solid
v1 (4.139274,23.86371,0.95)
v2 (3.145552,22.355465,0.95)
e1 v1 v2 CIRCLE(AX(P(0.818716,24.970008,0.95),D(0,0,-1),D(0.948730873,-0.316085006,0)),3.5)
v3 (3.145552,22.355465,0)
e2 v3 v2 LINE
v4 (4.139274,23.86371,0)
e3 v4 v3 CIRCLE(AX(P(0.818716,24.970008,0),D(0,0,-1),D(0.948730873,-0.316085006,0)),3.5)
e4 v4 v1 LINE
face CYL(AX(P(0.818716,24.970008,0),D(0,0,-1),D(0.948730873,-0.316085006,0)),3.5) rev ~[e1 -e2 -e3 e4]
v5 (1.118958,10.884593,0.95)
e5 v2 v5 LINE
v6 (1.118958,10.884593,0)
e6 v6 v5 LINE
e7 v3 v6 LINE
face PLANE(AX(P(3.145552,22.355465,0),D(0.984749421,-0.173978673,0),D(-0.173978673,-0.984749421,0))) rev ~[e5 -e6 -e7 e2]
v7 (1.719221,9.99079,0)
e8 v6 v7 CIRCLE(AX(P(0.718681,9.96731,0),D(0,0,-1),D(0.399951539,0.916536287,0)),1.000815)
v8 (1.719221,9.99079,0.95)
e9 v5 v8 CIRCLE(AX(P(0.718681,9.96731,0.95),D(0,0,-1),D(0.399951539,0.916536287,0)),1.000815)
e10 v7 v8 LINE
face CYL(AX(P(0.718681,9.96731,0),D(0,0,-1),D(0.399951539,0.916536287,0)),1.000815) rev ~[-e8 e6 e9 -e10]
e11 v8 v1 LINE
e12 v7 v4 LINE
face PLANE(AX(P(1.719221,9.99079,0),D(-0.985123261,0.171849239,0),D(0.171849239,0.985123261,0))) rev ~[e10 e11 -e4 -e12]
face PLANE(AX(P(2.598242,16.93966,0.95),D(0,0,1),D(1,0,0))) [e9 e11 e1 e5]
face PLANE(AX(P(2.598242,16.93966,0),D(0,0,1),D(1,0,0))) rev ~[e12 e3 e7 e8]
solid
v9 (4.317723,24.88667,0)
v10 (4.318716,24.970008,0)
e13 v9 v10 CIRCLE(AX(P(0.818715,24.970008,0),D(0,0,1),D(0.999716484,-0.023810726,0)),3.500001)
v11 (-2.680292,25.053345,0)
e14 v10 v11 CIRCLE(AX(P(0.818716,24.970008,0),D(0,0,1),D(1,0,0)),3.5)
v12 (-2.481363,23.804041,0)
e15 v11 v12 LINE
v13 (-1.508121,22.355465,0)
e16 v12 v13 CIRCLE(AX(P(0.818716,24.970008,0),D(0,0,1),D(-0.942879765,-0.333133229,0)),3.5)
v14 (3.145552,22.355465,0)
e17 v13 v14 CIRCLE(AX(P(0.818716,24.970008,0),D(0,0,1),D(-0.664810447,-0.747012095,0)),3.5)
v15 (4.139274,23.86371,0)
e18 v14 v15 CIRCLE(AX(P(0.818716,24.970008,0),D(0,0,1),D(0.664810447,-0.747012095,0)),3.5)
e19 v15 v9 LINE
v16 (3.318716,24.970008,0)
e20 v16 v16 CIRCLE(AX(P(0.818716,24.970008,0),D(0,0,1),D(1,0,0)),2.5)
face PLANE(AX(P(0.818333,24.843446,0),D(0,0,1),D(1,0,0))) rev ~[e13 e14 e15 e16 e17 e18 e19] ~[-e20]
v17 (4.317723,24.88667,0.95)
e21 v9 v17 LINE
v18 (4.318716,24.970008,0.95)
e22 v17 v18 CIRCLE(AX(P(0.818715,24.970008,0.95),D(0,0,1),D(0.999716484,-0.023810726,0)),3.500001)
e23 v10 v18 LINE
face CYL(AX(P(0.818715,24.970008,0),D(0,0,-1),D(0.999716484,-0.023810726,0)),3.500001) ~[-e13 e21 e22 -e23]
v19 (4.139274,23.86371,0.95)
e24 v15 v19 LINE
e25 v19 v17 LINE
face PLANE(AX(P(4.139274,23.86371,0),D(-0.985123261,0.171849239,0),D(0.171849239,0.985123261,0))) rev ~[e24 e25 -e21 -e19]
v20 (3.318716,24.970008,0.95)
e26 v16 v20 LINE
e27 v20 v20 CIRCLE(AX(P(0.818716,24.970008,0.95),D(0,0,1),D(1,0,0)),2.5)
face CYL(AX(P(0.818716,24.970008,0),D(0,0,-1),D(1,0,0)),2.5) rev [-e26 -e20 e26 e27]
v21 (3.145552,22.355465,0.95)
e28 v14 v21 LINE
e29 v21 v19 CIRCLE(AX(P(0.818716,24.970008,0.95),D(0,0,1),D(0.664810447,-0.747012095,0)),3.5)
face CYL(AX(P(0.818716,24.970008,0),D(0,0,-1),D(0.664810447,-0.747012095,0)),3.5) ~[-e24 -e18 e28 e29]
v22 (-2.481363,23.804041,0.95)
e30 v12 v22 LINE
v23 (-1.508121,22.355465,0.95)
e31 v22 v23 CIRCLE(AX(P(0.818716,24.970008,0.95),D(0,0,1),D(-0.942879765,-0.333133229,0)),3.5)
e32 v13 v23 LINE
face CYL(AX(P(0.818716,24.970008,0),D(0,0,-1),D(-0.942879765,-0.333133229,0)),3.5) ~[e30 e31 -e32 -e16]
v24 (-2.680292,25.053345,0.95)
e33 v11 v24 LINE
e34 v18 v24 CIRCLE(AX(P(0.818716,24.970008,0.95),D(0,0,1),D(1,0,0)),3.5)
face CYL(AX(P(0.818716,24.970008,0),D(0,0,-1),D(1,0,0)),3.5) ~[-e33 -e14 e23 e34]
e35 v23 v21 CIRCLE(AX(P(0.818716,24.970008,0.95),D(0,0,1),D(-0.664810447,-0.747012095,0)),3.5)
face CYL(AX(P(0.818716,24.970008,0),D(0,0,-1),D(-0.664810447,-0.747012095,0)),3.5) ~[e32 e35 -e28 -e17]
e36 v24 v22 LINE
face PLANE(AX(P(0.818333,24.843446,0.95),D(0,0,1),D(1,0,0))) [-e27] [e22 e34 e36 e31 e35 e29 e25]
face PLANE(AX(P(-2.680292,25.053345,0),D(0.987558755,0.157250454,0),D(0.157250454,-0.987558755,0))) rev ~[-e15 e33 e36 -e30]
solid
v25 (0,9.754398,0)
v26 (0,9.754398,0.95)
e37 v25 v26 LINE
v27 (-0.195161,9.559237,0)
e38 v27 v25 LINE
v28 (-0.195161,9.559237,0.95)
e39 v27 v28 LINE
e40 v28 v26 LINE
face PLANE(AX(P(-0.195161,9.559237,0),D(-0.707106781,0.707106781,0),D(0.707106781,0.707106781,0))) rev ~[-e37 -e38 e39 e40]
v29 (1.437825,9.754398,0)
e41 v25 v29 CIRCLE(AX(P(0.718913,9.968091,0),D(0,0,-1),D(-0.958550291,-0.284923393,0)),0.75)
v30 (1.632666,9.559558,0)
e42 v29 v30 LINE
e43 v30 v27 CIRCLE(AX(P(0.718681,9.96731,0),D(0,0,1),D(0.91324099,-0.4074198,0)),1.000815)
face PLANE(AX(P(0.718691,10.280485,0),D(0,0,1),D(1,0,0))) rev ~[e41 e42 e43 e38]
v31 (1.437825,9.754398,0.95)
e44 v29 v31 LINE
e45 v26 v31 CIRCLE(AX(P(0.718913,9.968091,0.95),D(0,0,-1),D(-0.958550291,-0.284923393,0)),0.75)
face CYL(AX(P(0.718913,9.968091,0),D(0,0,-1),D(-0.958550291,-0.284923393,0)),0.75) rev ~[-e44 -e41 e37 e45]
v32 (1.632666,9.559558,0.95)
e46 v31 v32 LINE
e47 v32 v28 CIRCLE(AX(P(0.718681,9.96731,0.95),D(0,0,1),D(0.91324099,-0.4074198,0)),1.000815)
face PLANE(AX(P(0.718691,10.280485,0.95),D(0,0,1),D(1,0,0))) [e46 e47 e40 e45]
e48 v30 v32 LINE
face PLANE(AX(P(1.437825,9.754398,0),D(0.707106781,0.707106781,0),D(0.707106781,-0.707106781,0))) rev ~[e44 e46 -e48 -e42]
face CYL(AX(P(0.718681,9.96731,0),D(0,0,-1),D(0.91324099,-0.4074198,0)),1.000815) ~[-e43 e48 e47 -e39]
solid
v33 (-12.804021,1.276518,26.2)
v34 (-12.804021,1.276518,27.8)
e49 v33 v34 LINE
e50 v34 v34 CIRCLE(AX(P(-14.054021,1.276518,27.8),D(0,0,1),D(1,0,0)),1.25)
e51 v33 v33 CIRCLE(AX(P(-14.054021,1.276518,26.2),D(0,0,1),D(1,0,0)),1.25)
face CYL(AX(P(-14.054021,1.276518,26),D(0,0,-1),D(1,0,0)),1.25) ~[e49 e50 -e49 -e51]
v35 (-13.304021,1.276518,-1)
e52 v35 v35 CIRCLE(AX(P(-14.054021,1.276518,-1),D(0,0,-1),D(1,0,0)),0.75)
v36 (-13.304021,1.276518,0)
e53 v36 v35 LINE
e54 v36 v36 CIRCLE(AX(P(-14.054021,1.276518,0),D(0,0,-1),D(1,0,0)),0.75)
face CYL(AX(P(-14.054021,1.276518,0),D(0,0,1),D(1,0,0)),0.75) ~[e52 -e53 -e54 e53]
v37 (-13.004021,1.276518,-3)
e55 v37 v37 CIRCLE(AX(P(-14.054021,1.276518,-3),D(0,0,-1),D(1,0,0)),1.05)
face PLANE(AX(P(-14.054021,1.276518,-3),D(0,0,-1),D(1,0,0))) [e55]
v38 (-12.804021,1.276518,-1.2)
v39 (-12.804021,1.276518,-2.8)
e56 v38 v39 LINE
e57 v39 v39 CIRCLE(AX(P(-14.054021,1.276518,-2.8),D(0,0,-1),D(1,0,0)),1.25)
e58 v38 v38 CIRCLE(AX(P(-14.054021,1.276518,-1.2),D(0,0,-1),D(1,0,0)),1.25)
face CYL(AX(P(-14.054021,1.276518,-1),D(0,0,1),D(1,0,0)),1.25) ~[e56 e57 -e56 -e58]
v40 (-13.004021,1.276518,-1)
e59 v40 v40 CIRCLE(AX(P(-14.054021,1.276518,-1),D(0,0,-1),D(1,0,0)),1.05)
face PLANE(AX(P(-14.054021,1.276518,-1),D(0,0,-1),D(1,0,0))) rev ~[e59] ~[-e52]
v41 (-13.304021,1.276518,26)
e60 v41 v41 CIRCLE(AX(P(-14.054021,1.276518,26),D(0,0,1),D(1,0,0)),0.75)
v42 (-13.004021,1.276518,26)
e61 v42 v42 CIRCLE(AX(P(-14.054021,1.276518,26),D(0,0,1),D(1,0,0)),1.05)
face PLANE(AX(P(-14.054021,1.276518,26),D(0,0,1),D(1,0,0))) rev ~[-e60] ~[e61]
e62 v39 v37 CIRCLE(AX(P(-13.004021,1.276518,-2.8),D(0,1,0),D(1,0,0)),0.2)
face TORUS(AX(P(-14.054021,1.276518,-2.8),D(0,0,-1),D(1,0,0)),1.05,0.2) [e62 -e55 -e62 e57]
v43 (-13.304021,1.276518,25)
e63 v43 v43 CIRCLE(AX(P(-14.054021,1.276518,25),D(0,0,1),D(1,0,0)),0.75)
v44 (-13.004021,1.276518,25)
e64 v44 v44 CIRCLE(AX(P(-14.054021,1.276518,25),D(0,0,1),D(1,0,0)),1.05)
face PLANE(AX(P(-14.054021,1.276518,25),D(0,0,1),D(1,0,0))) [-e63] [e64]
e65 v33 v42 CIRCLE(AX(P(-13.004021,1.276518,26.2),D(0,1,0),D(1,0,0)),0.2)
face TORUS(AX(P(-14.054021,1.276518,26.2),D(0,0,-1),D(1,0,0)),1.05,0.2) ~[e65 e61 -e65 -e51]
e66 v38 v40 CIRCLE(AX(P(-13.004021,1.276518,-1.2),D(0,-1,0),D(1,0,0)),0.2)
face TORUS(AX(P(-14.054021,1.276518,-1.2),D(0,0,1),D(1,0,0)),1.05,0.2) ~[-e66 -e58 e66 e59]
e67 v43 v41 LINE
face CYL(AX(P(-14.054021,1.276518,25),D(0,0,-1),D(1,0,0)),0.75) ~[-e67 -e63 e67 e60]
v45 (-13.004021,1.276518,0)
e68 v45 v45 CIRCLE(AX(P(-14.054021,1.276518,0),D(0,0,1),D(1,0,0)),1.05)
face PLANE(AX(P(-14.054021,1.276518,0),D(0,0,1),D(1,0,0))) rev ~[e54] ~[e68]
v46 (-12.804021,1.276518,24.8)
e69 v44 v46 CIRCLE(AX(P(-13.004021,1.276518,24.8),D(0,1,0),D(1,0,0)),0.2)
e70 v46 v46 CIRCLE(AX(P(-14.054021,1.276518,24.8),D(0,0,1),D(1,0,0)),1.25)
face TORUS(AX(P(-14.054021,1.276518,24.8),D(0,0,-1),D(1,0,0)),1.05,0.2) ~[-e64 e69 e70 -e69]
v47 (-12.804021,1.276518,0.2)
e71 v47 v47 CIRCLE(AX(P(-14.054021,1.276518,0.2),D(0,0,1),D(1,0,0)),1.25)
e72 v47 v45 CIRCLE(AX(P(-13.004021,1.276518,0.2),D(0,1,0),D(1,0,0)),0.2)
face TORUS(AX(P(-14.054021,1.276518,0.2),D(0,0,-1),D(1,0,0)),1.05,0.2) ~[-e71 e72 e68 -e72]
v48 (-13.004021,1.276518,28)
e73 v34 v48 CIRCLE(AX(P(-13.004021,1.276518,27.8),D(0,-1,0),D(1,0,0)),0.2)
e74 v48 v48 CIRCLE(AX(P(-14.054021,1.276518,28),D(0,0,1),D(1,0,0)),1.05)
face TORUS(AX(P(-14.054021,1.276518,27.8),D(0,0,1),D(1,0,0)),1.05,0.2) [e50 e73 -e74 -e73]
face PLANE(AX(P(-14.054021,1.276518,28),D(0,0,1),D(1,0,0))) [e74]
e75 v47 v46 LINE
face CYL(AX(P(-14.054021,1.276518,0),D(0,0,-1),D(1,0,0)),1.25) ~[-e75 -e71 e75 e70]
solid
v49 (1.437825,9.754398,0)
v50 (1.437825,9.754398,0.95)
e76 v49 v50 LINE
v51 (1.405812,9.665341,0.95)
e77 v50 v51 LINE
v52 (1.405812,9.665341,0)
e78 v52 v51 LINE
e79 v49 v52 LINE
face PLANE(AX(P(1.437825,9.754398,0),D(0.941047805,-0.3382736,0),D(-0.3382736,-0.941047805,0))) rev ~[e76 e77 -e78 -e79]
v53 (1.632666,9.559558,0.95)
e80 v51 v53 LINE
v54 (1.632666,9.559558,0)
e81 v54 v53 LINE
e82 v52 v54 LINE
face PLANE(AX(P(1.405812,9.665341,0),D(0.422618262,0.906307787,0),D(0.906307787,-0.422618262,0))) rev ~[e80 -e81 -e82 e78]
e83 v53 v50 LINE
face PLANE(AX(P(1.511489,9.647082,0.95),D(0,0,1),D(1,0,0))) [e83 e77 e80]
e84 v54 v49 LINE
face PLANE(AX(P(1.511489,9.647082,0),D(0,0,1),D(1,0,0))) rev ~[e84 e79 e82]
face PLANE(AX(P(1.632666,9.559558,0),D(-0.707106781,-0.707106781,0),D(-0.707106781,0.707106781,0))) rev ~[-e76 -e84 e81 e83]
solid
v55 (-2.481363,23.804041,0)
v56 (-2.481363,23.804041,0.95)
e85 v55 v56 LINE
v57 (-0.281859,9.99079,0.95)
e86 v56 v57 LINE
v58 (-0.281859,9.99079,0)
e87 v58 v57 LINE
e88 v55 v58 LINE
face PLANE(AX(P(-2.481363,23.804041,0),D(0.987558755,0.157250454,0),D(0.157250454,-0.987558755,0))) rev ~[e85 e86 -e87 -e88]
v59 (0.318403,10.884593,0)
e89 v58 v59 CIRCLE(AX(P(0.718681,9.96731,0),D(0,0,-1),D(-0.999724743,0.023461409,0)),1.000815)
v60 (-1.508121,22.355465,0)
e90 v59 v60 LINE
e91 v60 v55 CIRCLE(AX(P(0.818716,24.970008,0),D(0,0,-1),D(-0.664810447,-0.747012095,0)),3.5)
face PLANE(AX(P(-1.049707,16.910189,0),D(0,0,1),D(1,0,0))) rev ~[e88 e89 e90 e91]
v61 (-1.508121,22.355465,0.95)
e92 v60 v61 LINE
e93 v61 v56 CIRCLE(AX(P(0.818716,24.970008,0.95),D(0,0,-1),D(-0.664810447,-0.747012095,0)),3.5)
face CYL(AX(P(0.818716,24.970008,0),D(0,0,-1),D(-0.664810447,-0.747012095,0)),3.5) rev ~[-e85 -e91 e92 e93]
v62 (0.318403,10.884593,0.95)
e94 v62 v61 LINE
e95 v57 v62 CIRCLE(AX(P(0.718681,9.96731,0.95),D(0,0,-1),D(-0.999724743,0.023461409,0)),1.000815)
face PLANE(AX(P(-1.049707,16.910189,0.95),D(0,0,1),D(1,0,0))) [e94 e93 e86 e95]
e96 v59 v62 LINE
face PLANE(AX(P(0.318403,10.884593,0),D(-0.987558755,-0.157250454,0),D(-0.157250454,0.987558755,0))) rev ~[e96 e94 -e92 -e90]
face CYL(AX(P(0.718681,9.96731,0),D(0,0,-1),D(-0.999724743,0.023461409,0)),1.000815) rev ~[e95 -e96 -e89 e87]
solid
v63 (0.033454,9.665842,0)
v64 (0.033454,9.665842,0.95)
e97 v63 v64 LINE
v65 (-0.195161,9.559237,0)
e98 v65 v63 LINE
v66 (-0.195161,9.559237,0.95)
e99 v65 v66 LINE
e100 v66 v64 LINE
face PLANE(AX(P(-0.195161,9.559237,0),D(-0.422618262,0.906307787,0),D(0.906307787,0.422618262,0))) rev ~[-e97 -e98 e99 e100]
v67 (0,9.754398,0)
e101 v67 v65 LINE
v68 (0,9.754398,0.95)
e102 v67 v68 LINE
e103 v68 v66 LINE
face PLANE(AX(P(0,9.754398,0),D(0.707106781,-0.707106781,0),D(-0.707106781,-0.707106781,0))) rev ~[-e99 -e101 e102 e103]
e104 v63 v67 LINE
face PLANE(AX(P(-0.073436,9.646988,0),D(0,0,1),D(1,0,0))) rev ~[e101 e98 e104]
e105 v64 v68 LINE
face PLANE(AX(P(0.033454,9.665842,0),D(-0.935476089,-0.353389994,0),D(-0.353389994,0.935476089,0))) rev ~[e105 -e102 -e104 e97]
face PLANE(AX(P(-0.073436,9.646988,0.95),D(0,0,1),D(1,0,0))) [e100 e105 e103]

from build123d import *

# Parameters (mm, degrees)
F0_R      = 1.25
F1_DEPTH  = 25
F2_R      = 0.75
F3_DEPTH  = 1
F4_R      = 1.25
F5_DEPTH  = 2
F6_R      = 0.2
F7_R      = 0.75
F8_DEPTH  = 1
F9_R      = 1.25
F10_DEPTH = 2
F11_R     = 0.2
F14_DEPTH = 0.95
F13_R     = 2.5
F15_DEPTH = 0.95


# Not quite as in the source:
# - a feature names something its author has since deleted; it is built from what else it names


with BuildPart() as f1:
    # F0 (on Top) → F1 (new body)
    with BuildSketch(Plane.XY):
        with Locations((-14.0540208668, 1.2765177526)):
            Circle(F0_R)
    extrude(amount=F1_DEPTH)

    # F2 (on face) → F3 (join)
    with BuildSketch(Plane.XY.offset(25)):
        with Locations((-14.0540208668, 1.2765177526)):
            Circle(F2_R)
    extrude(amount=F3_DEPTH)

    # F4 (on face) → F5 (join)
    with BuildSketch(Plane.XY.offset(26)):
        with Locations((-14.0540208668, 1.2765177526)):
            Circle(F4_R)
    extrude(amount=F5_DEPTH)

    # F6
    f6_edges = [f1.edges().sort_by_distance(p)[0] for p in [
        (-15.304021, 1.276518, 25),
        (-15.304021, 1.276518, 26),
        (-15.304021, 1.276518, 28),
        (-15.304021, 1.276518, 0),
    ]]
    fillet(f6_edges, radius=F6_R)

    # F7 (on face) → F8 (join)
    with BuildSketch(Plane(origin=(0, 0, 0), x_dir=(1, 0, 0), z_dir=(0, 0, -1))):
        with Locations((-14.0540208668, -1.2765177526)):
            Circle(F7_R)
    extrude(amount=F8_DEPTH)

    # F9 (on face) → F10 (join)
    with BuildSketch(Plane(origin=(0, 0, -1), x_dir=(1, 0, 0), z_dir=(0, 0, -1))):
        with Locations((-14.0540208668, -1.2765177526)):
            Circle(F9_R)
    extrude(amount=F10_DEPTH)

    # F11
    f11_edges = [f1.edges().sort_by_distance(p)[0] for p in [
        (-15.304021, 1.276518, -3),
        (-15.304021, 1.276518, -1),
    ]]
    fillet(f11_edges, radius=F11_R)


with BuildPart() as f14:
    # F12 (on Top) → F14 (new body)
    with BuildSketch(Plane.XY):
        with BuildLine():
            ThreePointArc((0, 9.754398472), (0.718912718, 10.7180910171), (1.4378254361, 9.754398472))
            Line((1.4378254361, 9.754398472), (1.6326663215, 9.5595575866))
            ThreePointArc((1.6326663215, 9.5595575866), (0.7185053455, 10.9681246644), (-0.1951614716, 9.5592370004))
            Line((-0.1951614716, 9.5592370004), (0, 9.754398472))
        make_face()
    extrude(amount=F14_DEPTH)


with BuildPart() as f14b:
    # F13 (on face) → F14, piece 2 (new body)
    with BuildSketch(Plane.XY):
        with BuildLine():
            ThreePointArc((4.3177234546, 24.8866700044), (4.3184676742, 24.9283358265), (4.3187157592, 24.9700075561))
            ThreePointArc((4.3187157592, 24.9700075561), (0.8603874888, 28.4697594712), (-2.6802919362, 25.0533451079))
            Line((-2.6802919362, 25.0533451079), (-2.4813634191, 23.8040412543))
            ThreePointArc((-2.4813634191, 23.8040412543), (-2.0864758559, 23.0181208586), (-1.5081208042, 22.3554652239))
            ThreePointArc((-1.5081208042, 22.3554652239), (0.8187157592, 21.4700075561), (3.1455523226, 22.3554652239))
            ThreePointArc((3.1455523226, 22.3554652239), (3.7413801422, 23.044382228), (4.1392738139, 23.863710035))
            Line((4.1392738139, 23.863710035), (4.3177234546, 24.8866700044))
        make_face()
        with Locations((0.8187157592, 24.9700075561)):
            Circle(F13_R, mode=Mode.SUBTRACT)
    extrude(amount=F14_DEPTH)


with BuildPart() as f14c:
    # F13 (on face) → F14, piece 3 (new body)
    with BuildSketch(Plane.XY):
        Polygon((0, 9.754398472), (-0.1951614716, 9.5592370004), (0.0334535479, 9.6658419348), align=None)
    extrude(amount=F14_DEPTH)


with BuildPart() as f14d:
    # F13 (on face) → F14, piece 4 (new body)
    with BuildSketch(Plane.XY):
        Polygon((1.4058124998, 9.6653412609), (1.6326663215, 9.5595575866), (1.4378254361, 9.754398472), align=None)
    extrude(amount=F14_DEPTH)


with BuildPart() as f15:
    # F13 (on face) → F15 (new body)
    with BuildSketch(Plane.XY):
        with BuildLine():
            ThreePointArc((-1.5081208042, 22.3554652239), (-2.0864758559, 23.0181208586), (-2.4813634191, 23.8040412543))
            Line((-2.4813634191, 23.8040412543), (-0.281858813, 9.9907900398))
            ThreePointArc((-0.281858813, 9.9907900398), (-0.1121579443, 10.5252860826), (0.3184033106, 10.8845929296))
            Line((0.3184033106, 10.8845929296), (-1.5081208042, 22.3554652239))
        make_face()
    extrude(amount=F15_DEPTH)


with BuildPart() as f15b:
    # F13 (on face) → F15, piece 2 (new body)
    with BuildSketch(Plane.XY):
        with BuildLine():
            Line((1.7192205738, 9.9907900398), (4.1392738139, 23.863710035))
            ThreePointArc((4.1392738139, 23.863710035), (3.7413801422, 23.044382228), (3.1455523226, 22.3554652239))
            Line((3.1455523226, 22.3554652239), (1.1189584502, 10.8845929296))
            ThreePointArc((1.1189584502, 10.8845929296), (1.5495197052, 10.5252860826), (1.7192205738, 9.9907900398))
        make_face()
    extrude(amount=F15_DEPTH)


solid = Compound([f1.part, f14.part, f14b.part, f14c.part, f14d.part, f15.part, f15b.part])
